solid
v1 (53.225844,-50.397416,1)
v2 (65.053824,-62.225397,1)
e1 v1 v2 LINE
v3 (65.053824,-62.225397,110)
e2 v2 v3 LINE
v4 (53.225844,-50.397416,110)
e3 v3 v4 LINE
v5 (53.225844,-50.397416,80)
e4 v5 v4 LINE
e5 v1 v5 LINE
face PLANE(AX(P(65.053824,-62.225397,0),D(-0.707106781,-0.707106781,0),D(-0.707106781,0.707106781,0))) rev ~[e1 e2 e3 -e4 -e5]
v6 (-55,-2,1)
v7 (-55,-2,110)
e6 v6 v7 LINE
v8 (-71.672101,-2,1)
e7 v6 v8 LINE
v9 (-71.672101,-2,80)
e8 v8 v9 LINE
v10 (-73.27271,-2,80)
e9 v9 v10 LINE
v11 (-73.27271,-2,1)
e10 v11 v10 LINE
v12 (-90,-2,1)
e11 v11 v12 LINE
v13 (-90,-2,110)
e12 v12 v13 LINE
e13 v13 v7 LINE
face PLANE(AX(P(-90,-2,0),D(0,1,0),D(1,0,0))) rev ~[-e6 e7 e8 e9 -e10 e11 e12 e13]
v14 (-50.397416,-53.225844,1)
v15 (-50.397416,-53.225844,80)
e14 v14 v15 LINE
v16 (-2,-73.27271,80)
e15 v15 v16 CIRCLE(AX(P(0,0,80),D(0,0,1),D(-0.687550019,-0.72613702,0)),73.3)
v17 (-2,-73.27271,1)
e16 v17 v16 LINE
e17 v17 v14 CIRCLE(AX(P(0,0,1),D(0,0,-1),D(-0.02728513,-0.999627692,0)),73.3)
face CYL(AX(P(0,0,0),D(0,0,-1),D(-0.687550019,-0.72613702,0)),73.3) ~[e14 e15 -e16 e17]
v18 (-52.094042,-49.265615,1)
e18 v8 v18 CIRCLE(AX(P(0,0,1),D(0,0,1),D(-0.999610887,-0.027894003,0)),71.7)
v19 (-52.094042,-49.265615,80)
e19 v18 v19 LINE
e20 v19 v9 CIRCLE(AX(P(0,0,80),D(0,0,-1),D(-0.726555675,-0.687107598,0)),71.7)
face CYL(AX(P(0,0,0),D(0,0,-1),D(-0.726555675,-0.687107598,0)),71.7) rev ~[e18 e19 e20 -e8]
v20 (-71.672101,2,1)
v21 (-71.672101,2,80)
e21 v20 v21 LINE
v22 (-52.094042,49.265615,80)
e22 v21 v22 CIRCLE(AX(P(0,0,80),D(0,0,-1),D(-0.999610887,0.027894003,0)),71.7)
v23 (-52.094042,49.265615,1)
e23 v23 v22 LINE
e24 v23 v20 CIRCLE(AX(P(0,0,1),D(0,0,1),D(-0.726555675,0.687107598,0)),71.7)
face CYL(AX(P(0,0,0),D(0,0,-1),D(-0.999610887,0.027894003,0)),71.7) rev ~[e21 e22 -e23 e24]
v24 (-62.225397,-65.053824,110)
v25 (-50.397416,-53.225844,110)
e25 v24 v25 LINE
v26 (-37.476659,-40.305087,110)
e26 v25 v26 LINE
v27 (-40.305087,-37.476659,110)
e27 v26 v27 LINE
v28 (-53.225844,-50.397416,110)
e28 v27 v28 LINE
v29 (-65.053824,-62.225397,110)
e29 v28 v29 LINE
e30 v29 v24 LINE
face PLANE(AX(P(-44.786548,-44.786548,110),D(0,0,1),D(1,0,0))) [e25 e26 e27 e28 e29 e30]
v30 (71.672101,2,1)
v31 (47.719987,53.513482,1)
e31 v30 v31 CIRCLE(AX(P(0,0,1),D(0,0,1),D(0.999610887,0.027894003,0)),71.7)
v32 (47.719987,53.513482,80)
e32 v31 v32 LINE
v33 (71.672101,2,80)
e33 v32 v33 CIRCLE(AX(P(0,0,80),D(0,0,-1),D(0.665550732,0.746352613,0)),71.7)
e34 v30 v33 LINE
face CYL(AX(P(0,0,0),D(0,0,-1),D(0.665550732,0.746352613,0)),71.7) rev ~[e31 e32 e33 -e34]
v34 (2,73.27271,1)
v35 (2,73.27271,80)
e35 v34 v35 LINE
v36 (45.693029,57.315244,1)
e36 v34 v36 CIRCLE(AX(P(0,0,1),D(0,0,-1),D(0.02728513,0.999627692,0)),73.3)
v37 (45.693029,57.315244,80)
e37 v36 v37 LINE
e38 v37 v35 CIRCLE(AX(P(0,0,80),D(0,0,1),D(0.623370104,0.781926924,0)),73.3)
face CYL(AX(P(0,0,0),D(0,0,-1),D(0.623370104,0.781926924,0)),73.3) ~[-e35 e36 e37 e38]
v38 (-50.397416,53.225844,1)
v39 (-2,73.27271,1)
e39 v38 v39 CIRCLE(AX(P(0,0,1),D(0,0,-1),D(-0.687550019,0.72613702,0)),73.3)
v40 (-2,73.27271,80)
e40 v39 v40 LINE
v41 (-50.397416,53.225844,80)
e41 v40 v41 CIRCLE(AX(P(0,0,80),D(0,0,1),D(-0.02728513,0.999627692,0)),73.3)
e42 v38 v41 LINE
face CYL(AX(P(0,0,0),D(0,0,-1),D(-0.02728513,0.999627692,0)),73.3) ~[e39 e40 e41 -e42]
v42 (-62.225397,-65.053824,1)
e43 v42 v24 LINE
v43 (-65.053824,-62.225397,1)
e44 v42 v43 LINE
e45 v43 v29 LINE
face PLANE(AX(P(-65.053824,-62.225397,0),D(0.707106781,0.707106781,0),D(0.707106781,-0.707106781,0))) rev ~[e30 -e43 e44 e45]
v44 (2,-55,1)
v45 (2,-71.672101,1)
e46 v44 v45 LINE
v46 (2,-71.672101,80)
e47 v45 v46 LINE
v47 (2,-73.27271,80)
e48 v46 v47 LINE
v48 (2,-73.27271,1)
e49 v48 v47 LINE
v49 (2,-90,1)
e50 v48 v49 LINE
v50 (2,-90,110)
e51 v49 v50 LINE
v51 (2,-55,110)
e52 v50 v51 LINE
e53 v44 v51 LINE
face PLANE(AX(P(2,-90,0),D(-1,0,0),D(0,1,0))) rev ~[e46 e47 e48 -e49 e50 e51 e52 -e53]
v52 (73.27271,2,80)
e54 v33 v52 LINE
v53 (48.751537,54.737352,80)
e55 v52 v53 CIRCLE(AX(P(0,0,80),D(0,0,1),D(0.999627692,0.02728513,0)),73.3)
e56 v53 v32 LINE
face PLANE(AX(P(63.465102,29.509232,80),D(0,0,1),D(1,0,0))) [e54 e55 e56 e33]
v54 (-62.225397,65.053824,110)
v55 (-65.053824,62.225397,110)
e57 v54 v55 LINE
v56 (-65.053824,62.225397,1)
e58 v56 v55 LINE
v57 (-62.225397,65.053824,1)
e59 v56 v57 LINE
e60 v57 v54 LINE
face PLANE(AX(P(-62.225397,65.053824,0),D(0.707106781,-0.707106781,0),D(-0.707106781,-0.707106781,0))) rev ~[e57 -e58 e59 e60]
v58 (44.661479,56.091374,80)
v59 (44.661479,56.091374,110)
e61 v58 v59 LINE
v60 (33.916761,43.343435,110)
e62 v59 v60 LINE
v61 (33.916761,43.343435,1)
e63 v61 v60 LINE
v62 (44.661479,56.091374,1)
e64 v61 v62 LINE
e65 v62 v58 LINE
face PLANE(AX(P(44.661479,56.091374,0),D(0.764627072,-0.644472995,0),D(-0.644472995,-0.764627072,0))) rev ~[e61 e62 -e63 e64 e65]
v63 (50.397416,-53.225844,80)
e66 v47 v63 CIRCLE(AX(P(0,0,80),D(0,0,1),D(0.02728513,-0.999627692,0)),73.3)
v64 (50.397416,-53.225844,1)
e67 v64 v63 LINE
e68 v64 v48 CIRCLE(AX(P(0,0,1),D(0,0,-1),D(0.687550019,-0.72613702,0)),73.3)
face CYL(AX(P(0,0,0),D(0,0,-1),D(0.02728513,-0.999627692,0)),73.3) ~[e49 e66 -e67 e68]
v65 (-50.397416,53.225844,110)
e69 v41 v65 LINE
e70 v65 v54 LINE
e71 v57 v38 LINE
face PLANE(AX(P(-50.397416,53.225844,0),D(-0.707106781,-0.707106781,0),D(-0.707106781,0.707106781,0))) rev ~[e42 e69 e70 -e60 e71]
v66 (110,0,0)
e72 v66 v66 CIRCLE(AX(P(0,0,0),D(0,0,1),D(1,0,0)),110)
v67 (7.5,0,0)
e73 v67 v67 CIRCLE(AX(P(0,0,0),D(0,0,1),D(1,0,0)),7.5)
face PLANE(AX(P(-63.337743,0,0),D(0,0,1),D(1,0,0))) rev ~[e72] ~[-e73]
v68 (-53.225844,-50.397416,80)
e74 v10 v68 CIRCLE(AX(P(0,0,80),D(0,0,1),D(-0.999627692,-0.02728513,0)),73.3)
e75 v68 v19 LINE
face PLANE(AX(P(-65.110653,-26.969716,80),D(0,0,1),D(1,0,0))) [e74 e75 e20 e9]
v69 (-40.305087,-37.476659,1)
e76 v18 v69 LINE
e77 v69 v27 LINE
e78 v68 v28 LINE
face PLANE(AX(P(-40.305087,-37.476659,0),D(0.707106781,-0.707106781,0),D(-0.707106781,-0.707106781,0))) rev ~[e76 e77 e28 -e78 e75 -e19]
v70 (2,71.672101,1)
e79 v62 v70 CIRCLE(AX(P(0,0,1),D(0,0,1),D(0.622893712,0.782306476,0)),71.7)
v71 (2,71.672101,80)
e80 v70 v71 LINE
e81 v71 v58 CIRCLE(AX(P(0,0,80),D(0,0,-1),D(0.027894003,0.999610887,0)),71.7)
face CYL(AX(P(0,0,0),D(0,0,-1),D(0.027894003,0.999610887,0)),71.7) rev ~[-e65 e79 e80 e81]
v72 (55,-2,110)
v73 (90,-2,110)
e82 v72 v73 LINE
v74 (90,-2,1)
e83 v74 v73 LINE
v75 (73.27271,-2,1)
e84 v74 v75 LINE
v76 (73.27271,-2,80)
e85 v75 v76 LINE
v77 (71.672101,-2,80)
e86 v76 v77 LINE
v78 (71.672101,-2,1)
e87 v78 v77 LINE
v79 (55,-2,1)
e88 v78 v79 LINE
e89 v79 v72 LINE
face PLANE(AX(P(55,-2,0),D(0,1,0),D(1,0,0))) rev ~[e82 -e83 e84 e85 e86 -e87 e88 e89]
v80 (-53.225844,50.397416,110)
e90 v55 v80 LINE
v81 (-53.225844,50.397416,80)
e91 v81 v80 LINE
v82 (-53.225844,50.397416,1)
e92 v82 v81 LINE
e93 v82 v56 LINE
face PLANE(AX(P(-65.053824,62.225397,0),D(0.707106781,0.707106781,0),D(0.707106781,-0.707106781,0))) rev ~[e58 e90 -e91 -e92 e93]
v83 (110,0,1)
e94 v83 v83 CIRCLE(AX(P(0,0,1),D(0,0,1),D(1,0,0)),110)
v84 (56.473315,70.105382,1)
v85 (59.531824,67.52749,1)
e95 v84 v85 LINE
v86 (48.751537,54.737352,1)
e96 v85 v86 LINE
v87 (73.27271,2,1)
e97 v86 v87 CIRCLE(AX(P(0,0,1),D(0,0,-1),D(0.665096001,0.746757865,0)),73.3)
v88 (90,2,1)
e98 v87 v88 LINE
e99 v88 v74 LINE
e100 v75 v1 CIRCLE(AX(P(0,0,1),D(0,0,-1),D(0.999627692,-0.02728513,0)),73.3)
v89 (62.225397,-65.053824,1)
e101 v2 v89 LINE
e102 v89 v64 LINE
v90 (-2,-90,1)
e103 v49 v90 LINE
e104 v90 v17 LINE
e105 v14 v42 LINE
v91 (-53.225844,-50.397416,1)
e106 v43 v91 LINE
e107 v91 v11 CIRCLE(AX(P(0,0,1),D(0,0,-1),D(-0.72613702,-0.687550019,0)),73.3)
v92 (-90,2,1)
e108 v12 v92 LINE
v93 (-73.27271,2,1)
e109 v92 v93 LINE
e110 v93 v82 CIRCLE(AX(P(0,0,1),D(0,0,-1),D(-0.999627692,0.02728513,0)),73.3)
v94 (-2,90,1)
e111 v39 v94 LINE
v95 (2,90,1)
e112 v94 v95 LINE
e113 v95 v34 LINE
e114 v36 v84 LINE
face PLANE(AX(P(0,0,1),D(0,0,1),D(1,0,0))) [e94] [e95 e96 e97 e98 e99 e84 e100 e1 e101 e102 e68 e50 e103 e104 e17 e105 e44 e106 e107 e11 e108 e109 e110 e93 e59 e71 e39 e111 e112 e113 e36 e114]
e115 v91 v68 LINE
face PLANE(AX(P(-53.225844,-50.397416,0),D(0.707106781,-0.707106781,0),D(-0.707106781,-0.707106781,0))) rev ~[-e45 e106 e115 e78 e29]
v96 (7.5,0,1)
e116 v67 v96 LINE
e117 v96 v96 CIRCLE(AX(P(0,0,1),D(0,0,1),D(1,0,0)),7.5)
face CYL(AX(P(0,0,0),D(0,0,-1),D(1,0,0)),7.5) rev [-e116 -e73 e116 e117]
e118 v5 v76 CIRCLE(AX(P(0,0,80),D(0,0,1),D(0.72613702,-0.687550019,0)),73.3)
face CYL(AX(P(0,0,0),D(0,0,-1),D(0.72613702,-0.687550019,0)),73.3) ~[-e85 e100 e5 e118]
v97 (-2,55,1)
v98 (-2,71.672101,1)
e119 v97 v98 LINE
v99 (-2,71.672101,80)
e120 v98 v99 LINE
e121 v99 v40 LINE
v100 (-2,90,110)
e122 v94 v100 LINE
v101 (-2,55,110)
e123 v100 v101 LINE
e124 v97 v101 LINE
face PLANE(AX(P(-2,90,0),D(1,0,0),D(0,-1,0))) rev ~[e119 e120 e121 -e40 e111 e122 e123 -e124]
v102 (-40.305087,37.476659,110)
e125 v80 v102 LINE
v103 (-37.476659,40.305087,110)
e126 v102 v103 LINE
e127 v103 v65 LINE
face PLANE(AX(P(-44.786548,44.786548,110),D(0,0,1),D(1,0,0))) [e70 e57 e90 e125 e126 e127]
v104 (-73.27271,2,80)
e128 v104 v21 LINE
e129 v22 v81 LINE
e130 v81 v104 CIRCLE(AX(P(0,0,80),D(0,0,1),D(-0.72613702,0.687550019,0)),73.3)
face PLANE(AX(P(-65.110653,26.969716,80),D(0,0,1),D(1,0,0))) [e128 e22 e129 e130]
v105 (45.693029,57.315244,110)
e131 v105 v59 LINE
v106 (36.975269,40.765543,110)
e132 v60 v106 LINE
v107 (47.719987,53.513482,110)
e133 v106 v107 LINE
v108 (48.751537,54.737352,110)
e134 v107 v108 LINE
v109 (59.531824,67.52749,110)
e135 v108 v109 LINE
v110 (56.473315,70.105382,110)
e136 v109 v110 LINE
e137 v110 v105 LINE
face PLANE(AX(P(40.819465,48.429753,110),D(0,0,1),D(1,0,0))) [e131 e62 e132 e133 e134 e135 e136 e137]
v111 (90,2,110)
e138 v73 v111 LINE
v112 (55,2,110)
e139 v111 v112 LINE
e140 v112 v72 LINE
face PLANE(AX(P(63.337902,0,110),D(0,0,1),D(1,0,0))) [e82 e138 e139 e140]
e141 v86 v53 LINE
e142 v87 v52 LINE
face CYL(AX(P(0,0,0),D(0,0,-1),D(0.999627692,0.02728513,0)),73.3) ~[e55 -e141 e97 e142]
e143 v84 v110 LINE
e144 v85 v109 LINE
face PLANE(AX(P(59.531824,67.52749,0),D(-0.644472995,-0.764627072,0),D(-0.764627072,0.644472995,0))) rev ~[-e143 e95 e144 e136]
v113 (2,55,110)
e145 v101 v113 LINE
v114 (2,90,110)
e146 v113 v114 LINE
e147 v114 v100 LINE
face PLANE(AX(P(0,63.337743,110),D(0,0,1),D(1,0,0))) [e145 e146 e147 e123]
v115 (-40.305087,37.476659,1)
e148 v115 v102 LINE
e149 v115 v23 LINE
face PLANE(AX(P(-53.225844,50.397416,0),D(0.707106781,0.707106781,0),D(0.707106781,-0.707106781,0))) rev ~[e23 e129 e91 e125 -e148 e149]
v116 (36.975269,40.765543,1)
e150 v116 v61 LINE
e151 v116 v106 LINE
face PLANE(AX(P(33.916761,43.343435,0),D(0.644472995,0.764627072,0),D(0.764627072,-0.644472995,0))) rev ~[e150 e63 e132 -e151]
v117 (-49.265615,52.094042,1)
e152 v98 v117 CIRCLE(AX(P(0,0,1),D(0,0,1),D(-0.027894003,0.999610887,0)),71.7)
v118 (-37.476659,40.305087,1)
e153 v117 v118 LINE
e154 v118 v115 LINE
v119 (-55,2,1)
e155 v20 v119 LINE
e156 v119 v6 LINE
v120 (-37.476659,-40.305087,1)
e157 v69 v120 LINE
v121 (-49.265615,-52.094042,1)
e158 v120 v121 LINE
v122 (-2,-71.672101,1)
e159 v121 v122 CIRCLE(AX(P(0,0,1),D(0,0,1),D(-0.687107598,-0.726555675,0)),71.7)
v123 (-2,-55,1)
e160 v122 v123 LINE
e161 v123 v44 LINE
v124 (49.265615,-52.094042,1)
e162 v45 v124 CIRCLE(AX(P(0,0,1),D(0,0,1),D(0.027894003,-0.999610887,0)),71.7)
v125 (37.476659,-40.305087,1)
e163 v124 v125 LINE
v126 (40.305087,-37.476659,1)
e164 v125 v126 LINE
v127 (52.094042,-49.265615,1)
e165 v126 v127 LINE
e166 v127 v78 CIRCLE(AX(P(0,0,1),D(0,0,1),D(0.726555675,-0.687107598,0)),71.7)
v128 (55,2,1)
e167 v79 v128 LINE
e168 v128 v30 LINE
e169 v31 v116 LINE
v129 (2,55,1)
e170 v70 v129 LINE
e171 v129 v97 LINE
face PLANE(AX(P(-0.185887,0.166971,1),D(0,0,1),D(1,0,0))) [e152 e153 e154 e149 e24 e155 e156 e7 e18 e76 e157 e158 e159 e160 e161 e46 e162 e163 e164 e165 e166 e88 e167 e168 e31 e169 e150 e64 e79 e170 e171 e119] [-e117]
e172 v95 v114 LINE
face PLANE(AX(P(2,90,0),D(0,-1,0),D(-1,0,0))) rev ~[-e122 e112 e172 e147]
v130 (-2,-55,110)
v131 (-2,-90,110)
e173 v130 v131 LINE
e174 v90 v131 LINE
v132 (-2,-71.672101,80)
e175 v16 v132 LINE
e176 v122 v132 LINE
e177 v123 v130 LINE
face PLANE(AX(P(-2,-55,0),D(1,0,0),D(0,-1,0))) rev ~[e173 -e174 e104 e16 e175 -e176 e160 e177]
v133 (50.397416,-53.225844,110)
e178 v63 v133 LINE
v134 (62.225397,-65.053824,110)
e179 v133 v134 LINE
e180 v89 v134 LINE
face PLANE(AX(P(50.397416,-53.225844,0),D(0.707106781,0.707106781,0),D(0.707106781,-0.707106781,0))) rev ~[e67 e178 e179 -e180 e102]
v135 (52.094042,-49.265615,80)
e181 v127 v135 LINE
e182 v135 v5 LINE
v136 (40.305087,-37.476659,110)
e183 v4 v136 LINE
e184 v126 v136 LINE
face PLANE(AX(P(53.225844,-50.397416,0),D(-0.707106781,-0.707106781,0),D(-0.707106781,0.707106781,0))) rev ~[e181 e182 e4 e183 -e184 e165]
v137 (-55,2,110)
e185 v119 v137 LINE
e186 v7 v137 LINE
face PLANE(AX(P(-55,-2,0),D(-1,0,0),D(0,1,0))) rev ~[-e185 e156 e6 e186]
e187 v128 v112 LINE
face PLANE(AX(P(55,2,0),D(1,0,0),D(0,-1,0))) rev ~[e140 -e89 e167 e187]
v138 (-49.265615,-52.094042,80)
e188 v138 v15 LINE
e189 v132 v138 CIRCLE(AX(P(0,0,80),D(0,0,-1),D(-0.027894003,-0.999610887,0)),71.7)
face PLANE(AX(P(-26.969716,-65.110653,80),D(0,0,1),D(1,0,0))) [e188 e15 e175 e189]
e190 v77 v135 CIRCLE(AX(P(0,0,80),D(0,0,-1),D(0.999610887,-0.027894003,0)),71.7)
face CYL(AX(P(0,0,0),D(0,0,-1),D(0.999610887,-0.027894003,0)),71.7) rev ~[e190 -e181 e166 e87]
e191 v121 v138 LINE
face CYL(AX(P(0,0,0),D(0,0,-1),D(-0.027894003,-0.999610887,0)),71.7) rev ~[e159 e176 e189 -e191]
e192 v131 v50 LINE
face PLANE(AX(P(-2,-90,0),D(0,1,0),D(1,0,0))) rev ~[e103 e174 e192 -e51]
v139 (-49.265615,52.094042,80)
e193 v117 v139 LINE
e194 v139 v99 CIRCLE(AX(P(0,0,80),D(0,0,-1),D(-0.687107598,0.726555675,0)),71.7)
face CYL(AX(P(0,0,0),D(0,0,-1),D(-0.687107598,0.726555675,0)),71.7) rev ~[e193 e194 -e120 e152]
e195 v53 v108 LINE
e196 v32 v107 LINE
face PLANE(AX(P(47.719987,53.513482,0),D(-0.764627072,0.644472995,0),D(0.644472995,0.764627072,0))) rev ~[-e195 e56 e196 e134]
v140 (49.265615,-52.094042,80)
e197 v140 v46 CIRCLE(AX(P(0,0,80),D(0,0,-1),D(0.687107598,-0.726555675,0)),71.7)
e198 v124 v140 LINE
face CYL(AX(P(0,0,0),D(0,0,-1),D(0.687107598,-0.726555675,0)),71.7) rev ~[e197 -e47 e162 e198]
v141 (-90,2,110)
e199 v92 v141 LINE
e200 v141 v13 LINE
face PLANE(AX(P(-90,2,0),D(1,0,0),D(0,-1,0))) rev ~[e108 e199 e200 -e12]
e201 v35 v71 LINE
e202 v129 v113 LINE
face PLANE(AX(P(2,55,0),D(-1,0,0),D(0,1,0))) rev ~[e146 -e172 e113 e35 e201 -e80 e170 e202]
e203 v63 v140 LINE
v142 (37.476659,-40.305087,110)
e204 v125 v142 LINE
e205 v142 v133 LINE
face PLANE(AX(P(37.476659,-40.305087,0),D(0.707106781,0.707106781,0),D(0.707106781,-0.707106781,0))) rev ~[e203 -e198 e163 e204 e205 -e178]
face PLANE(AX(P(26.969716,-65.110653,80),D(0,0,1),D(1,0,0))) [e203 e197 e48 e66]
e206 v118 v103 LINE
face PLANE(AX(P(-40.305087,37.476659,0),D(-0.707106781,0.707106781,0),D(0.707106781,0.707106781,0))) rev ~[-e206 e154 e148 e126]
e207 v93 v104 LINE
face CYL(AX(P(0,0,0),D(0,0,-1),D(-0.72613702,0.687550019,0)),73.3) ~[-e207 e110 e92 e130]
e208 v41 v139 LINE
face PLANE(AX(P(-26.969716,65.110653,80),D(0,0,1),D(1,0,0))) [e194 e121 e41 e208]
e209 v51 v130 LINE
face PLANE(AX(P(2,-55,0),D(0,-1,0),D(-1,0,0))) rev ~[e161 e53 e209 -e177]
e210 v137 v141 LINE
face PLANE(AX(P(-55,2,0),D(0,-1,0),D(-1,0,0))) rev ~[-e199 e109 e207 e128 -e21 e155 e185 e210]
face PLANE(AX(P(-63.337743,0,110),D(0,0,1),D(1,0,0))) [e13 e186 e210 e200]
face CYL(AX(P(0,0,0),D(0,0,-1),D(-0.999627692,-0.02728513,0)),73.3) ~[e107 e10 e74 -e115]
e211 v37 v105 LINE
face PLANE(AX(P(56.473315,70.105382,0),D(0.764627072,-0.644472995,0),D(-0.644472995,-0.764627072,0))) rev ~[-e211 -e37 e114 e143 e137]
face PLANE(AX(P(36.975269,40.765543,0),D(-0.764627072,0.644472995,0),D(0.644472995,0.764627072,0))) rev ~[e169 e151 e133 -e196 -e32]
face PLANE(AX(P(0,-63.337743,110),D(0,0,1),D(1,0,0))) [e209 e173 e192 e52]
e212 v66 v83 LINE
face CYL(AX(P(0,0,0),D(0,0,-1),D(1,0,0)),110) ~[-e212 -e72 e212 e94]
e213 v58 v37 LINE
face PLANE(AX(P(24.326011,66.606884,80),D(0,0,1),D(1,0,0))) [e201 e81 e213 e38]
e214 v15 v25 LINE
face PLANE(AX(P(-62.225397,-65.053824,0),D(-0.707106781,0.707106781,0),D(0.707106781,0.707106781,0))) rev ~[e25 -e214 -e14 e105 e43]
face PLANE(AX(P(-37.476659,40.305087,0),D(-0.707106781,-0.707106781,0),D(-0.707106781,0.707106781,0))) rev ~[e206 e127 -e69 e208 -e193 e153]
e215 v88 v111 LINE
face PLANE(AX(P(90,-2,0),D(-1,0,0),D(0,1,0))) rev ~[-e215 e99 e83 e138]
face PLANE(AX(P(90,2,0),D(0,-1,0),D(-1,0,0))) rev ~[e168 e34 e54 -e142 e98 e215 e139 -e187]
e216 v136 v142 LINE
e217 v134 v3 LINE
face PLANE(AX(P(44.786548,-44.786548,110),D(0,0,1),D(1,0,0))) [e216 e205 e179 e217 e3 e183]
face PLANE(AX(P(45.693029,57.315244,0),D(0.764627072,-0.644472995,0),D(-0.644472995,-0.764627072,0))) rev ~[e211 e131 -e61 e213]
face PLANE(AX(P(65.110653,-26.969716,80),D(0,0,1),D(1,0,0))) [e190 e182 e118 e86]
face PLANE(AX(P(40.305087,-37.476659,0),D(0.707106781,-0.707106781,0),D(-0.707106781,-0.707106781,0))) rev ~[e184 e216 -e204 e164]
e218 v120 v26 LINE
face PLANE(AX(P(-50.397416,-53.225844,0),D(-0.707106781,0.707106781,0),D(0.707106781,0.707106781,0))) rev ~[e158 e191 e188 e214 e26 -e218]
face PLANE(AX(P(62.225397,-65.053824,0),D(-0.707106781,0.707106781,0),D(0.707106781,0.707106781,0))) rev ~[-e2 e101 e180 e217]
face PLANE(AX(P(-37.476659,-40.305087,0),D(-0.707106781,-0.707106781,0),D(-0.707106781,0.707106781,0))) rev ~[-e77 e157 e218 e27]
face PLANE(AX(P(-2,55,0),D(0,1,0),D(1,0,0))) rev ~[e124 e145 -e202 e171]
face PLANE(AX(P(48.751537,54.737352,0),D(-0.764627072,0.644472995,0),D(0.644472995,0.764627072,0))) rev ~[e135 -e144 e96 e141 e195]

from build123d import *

# Parameters (mm, degrees)
F0_R     = 110
F1_DEPTH = 1
F0_R_2   = 7.5
F2_DEPTH = 110
F3_DEPTH = 80


with BuildPart() as f1:
    # F0 (on Top) → F1 (new body)
    with BuildSketch(Plane.XY):
        Circle(F0_R)
        with BuildLine():
            Line((-90, 2), (-73.2727097902, 2))
            ThreePointArc((-73.2727097902, 2), (-67.7203697331, 28.0506955924), (-53.2258435309, 50.3974164062))
            Line((-53.2258435309, 50.3974164062), (-65.0538238692, 62.2253967444))
            Line((-65.0538238692, 62.2253967444), (-62.2253967444, 65.0538238692))
            Line((-62.2253967444, 65.0538238692), (-50.3974164062, 53.2258435309))
            ThreePointArc((-50.3974164062, 53.2258435309), (-28.0506955924, 67.7203697331), (-2, 73.2727097902))
            Line((-2, 73.2727097902), (-2, 90))
            Line((-2, 90), (2, 90))
            Line((2, 90), (2, 73.2727097902))
            ThreePointArc((2, 73.2727097902), (25.1459027822, 68.8518233111), (45.6930285955, 57.3152435027))
            Line((45.6930285955, 57.3152435027), (56.4733154171, 70.105382431))
            Line((56.4733154171, 70.105382431), (59.5318237034, 67.5274904506))
            Line((59.5318237034, 67.5274904506), (48.7515368817, 54.7373515223))
            ThreePointArc((48.7515368817, 54.7373515223), (66.4664295367, 30.904752784), (73.2727097902, 2))
            Line((73.2727097902, 2), (90, 2))
            Line((90, 2), (90, -2))
            Line((90, -2), (73.2727097902, -2))
            ThreePointArc((73.2727097902, -2), (67.7203697331, -28.0506955924), (53.2258435309, -50.3974164062))
            Line((53.2258435309, -50.3974164062), (65.0538238692, -62.2253967444))
            Line((65.0538238692, -62.2253967444), (62.2253967444, -65.0538238692))
            Line((62.2253967444, -65.0538238692), (50.3974164062, -53.2258435309))
            ThreePointArc((50.3974164062, -53.2258435309), (28.0506955924, -67.7203697331), (2, -73.2727097902))
            Line((2, -73.2727097902), (2, -90))
            Line((2, -90), (-2, -90))
            Line((-2, -90), (-2, -73.2727097902))
            ThreePointArc((-2, -73.2727097902), (-28.0506955924, -67.7203697331), (-50.3974164062, -53.2258435309))
            Line((-50.3974164062, -53.2258435309), (-62.2253967444, -65.0538238692))
            Line((-62.2253967444, -65.0538238692), (-65.0538238692, -62.2253967444))
            Line((-65.0538238692, -62.2253967444), (-53.2258435309, -50.3974164062))
            ThreePointArc((-53.2258435309, -50.3974164062), (-67.7203697331, -28.0506955924), (-73.2727097902, -2))
            Line((-73.2727097902, -2), (-90, -2))
            Line((-90, -2), (-90, 2))
        make_face(mode=Mode.SUBTRACT)
    extrude(amount=F1_DEPTH)



with BuildPart() as f1b:
    # F0 (on Top) → F1, piece 2 (new body)
    with BuildSketch(Plane.XY):
        with BuildLine():
            Line((-71.6721005692, 2), (-55, 2))
            Line((-55, 2), (-55, -2))
            Line((-55, -2), (-71.6721005692, -2))
            ThreePointArc((-71.6721005692, -2), (-66.2421624811, -27.4384021006), (-52.0940418967, -49.265614772))
            Line((-52.0940418967, -49.265614772), (-40.3050865276, -37.4766594029))
            Line((-40.3050865276, -37.4766594029), (-37.4766594029, -40.3050865276))
            Line((-37.4766594029, -40.3050865276), (-49.265614772, -52.0940418967))
            ThreePointArc((-49.265614772, -52.0940418967), (-27.4384021006, -66.2421624811), (-2, -71.6721005692))
            Line((-2, -71.6721005692), (-2, -55))
            Line((-2, -55), (2, -55))
            Line((2, -55), (2, -71.6721005692))
            ThreePointArc((2, -71.6721005692), (27.4384021006, -66.2421624811), (49.265614772, -52.0940418967))
            Line((49.265614772, -52.0940418967), (37.4766594029, -40.3050865276))
            Line((37.4766594029, -40.3050865276), (40.3050865276, -37.4766594029))
            Line((40.3050865276, -37.4766594029), (52.0940418967, -49.265614772))
            ThreePointArc((52.0940418967, -49.265614772), (66.2421624811, -27.4384021006), (71.6721005692, -2))
            Line((71.6721005692, -2), (55, -2))
            Line((55, -2), (55, 2))
            Line((55, 2), (71.6721005692, 2))
            ThreePointArc((71.6721005692, 2), (65.0155934213, 30.2301606359), (47.719987463, 53.5134823809))
            Line((47.719987463, 53.5134823809), (36.9752688744, 40.7655429458))
            Line((36.9752688744, 40.7655429458), (33.9167605881, 43.3434349263))
            Line((33.9167605881, 43.3434349263), (44.6614791768, 56.0913743613))
            ThreePointArc((44.6614791768, 56.0913743613), (24.597015409, 67.3489185731), (2, 71.6721005692))
            Line((2, 71.6721005692), (2, 55))
            Line((2, 55), (-2, 55))
            Line((-2, 55), (-2, 71.6721005692))
            ThreePointArc((-2, 71.6721005692), (-27.4384021006, 66.2421624811), (-49.265614772, 52.0940418967))
            Line((-49.265614772, 52.0940418967), (-37.4766594029, 40.3050865276))
            Line((-37.4766594029, 40.3050865276), (-40.3050865276, 37.4766594029))
            Line((-40.3050865276, 37.4766594029), (-52.0940418967, 49.265614772))
            ThreePointArc((-52.0940418967, 49.265614772), (-66.2421624811, 27.4384021006), (-71.6721005692, 2))
        make_face()
        Circle(F0_R_2, mode=Mode.SUBTRACT)
    extrude(amount=F1_DEPTH)


with BuildPart() as f1_1:
    add(f1.part)

    add(f1b.part)  # F2 merges F1b
    # F0 (on Top) → F2 (join)
    with BuildSketch(Plane.XY):
        with BuildLine():
            Line((-55, -2), (-55, 2))
            Line((-55, 2), (-71.6721005692, 2))
            ThreePointArc((-71.6721005692, 2), (-71.7, 0), (-71.6721005692, -2))
            Line((-71.6721005692, -2), (-55, -2))
        make_face()
        with BuildLine():
            ThreePointArc((-71.6721005692, -2), (-71.7, 0), (-71.6721005692, 2))
            Line((-71.6721005692, 2), (-73.2727097902, 2))
            ThreePointArc((-73.2727097902, 2), (-73.3, 0), (-73.2727097902, -2))
            Line((-73.2727097902, -2), (-71.6721005692, -2))
        make_face()
        with BuildLine():
            ThreePointArc((-73.2727097902, -2), (-73.3, 0), (-73.2727097902, 2))
            Line((-73.2727097902, 2), (-90, 2))
            Line((-90, 2), (-90, -2))
            Line((-90, -2), (-73.2727097902, -2))
        make_face()
        with BuildLine():
            ThreePointArc((-49.265614772, 52.0940418967), (-50.6995562111, 50.6995562111), (-52.0940418967, 49.265614772))
            Line((-52.0940418967, 49.265614772), (-40.3050865276, 37.4766594029))
            Line((-40.3050865276, 37.4766594029), (-37.4766594029, 40.3050865276))
            Line((-37.4766594029, 40.3050865276), (-49.265614772, 52.0940418967))
        make_face()
        with BuildLine():
            Line((-53.2258435309, 50.3974164062), (-52.0940418967, 49.265614772))
            ThreePointArc((-52.0940418967, 49.265614772), (-50.6995562111, 50.6995562111), (-49.265614772, 52.0940418967))
            Line((-49.265614772, 52.0940418967), (-50.3974164062, 53.2258435309))
            ThreePointArc((-50.3974164062, 53.2258435309), (-51.830927061, 51.830927061), (-53.2258435309, 50.3974164062))
        make_face()
        with BuildLine():
            Line((-65.0538238692, 62.2253967444), (-53.2258435309, 50.3974164062))
            ThreePointArc((-53.2258435309, 50.3974164062), (-51.830927061, 51.830927061), (-50.3974164062, 53.2258435309))
            Line((-50.3974164062, 53.2258435309), (-62.2253967444, 65.0538238692))
            Line((-62.2253967444, 65.0538238692), (-65.0538238692, 62.2253967444))
        make_face()
        with BuildLine():
            ThreePointArc((2, 71.6721005692), (0, 71.7), (-2, 71.6721005692))
            Line((-2, 71.6721005692), (-2, 55))
            Line((-2, 55), (2, 55))
            Line((2, 55), (2, 71.6721005692))
        make_face()
        with BuildLine():
            Line((-2, 73.2727097902), (-2, 71.6721005692))
            ThreePointArc((-2, 71.6721005692), (0, 71.7), (2, 71.6721005692))
            Line((2, 71.6721005692), (2, 73.2727097902))
            ThreePointArc((2, 73.2727097902), (0, 73.3), (-2, 73.2727097902))
        make_face()
        with BuildLine():
            Line((-2, 90), (-2, 73.2727097902))
            ThreePointArc((-2, 73.2727097902), (0, 73.3), (2, 73.2727097902))
            Line((2, 73.2727097902), (2, 90))
            Line((2, 90), (-2, 90))
        make_face()
        with BuildLine():
            ThreePointArc((47.719987463, 53.5134823809), (46.2087137496, 54.8237610312), (44.6614791768, 56.0913743613))
            Line((44.6614791768, 56.0913743613), (33.9167605881, 43.3434349263))
            Line((33.9167605881, 43.3434349263), (36.9752688744, 40.7655429458))
            Line((36.9752688744, 40.7655429458), (47.719987463, 53.5134823809))
        make_face()
        with BuildLine():
            Line((45.6930285955, 57.3152435027), (44.6614791768, 56.0913743613))
            ThreePointArc((44.6614791768, 56.0913743613), (46.2087137496, 54.8237610312), (47.719987463, 53.5134823809))
            Line((47.719987463, 53.5134823809), (48.7515368817, 54.7373515223))
            ThreePointArc((48.7515368817, 54.7373515223), (47.2398705418, 56.0471643457), (45.6930285955, 57.3152435027))
        make_face()
        with BuildLine():
            Line((56.4733154171, 70.105382431), (45.6930285955, 57.3152435027))
            ThreePointArc((45.6930285955, 57.3152435027), (47.2398705418, 56.0471643457), (48.7515368817, 54.7373515223))
            Line((48.7515368817, 54.7373515223), (59.5318237034, 67.5274904506))
            Line((59.5318237034, 67.5274904506), (56.4733154171, 70.105382431))
        make_face()
        with BuildLine():
            ThreePointArc((71.7, 0), (71.693024803, 1.0000972925), (71.6721005692, 2))
            Line((71.6721005692, 2), (55, 2))
            Line((55, 2), (55, -2))
            Line((55, -2), (71.6721005692, -2))
            ThreePointArc((71.6721005692, -2), (71.693024803, -1.0000972925), (71.7, 0))
        make_face()
        with BuildLine():
            Line((73.2727097902, 2), (71.6721005692, 2))
            ThreePointArc((71.6721005692, 2), (71.693024803, 1.0000972925), (71.7, 0))
            ThreePointArc((71.7, 0), (71.693024803, -1.0000972925), (71.6721005692, -2))
            Line((71.6721005692, -2), (73.2727097902, -2))
            ThreePointArc((73.2727097902, -2), (73.29317713, -1.0000930901), (73.3, 0))
            ThreePointArc((73.3, 0), (73.29317713, 1.0000930901), (73.2727097902, 2))
        make_face()
        with BuildLine():
            Line((90, 2), (73.2727097902, 2))
            ThreePointArc((73.2727097902, 2), (73.29317713, 1.0000930901), (73.3, 0))
            ThreePointArc((73.3, 0), (73.29317713, -1.0000930901), (73.2727097902, -2))
            Line((73.2727097902, -2), (90, -2))
            Line((90, -2), (90, 2))
        make_face()
        with BuildLine():
            Line((37.4766594029, -40.3050865276), (49.265614772, -52.0940418967))
            ThreePointArc((49.265614772, -52.0940418967), (50.6995562111, -50.6995562111), (52.0940418967, -49.265614772))
            Line((52.0940418967, -49.265614772), (40.3050865276, -37.4766594029))
            Line((40.3050865276, -37.4766594029), (37.4766594029, -40.3050865276))
        make_face()
        with BuildLine():
            ThreePointArc((52.0940418967, -49.265614772), (50.6995562111, -50.6995562111), (49.265614772, -52.0940418967))
            Line((49.265614772, -52.0940418967), (50.3974164062, -53.2258435309))
            ThreePointArc((50.3974164062, -53.2258435309), (51.830927061, -51.830927061), (53.2258435309, -50.3974164062))
            Line((53.2258435309, -50.3974164062), (52.0940418967, -49.265614772))
        make_face()
        with BuildLine():
            ThreePointArc((53.2258435309, -50.3974164062), (51.830927061, -51.830927061), (50.3974164062, -53.2258435309))
            Line((50.3974164062, -53.2258435309), (62.2253967444, -65.0538238692))
            Line((62.2253967444, -65.0538238692), (65.0538238692, -62.2253967444))
            Line((65.0538238692, -62.2253967444), (53.2258435309, -50.3974164062))
        make_face()
        with BuildLine():
            Line((-2, -55), (-2, -71.6721005692))
            ThreePointArc((-2, -71.6721005692), (0, -71.7), (2, -71.6721005692))
            Line((2, -71.6721005692), (2, -55))
            Line((2, -55), (-2, -55))
        make_face()
        with BuildLine():
            ThreePointArc((2, -71.6721005692), (0, -71.7), (-2, -71.6721005692))
            Line((-2, -71.6721005692), (-2, -73.2727097902))
            ThreePointArc((-2, -73.2727097902), (0, -73.3), (2, -73.2727097902))
            Line((2, -73.2727097902), (2, -71.6721005692))
        make_face()
        with BuildLine():
            ThreePointArc((2, -73.2727097902), (0, -73.3), (-2, -73.2727097902))
            Line((-2, -73.2727097902), (-2, -90))
            Line((-2, -90), (2, -90))
            Line((2, -90), (2, -73.2727097902))
        make_face()
        with BuildLine():
            Line((-40.3050865276, -37.4766594029), (-52.0940418967, -49.265614772))
            ThreePointArc((-52.0940418967, -49.265614772), (-50.6995562111, -50.6995562111), (-49.265614772, -52.0940418967))
            Line((-49.265614772, -52.0940418967), (-37.4766594029, -40.3050865276))
            Line((-37.4766594029, -40.3050865276), (-40.3050865276, -37.4766594029))
        make_face()
        with BuildLine():
            ThreePointArc((-49.265614772, -52.0940418967), (-50.6995562111, -50.6995562111), (-52.0940418967, -49.265614772))
            Line((-52.0940418967, -49.265614772), (-53.2258435309, -50.3974164062))
            ThreePointArc((-53.2258435309, -50.3974164062), (-51.830927061, -51.830927061), (-50.3974164062, -53.2258435309))
            Line((-50.3974164062, -53.2258435309), (-49.265614772, -52.0940418967))
        make_face()
        with BuildLine():
            ThreePointArc((-50.3974164062, -53.2258435309), (-51.830927061, -51.830927061), (-53.2258435309, -50.3974164062))
            Line((-53.2258435309, -50.3974164062), (-65.0538238692, -62.2253967444))
            Line((-65.0538238692, -62.2253967444), (-62.2253967444, -65.0538238692))
            Line((-62.2253967444, -65.0538238692), (-50.3974164062, -53.2258435309))
        make_face()
    extrude(amount=F2_DEPTH)

    # F0 (on Top) → F3 (join)
    with BuildSketch(Plane.XY):
        with BuildLine():
            Line((-73.2727097902, 2), (-71.6721005692, 2))
            ThreePointArc((-71.6721005692, 2), (-66.2421624811, 27.4384021006), (-52.0940418967, 49.265614772))
            Line((-52.0940418967, 49.265614772), (-53.2258435309, 50.3974164062))
            ThreePointArc((-53.2258435309, 50.3974164062), (-67.7203697331, 28.0506955924), (-73.2727097902, 2))
        make_face()
        with BuildLine():
            Line((-50.3974164062, 53.2258435309), (-49.265614772, 52.0940418967))
            ThreePointArc((-49.265614772, 52.0940418967), (-27.4384021006, 66.2421624811), (-2, 71.6721005692))
            Line((-2, 71.6721005692), (-2, 73.2727097902))
            ThreePointArc((-2, 73.2727097902), (-28.0506955924, 67.7203697331), (-50.3974164062, 53.2258435309))
        make_face()
        with BuildLine():
            Line((2, 73.2727097902), (2, 71.6721005692))
            ThreePointArc((2, 71.6721005692), (24.597015409, 67.3489185731), (44.6614791768, 56.0913743613))
            Line((44.6614791768, 56.0913743613), (45.6930285955, 57.3152435027))
            ThreePointArc((45.6930285955, 57.3152435027), (25.1459027822, 68.8518233111), (2, 73.2727097902))
        make_face()
        with BuildLine():
            Line((48.7515368817, 54.7373515223), (47.719987463, 53.5134823809))
            ThreePointArc((47.719987463, 53.5134823809), (65.0155934213, 30.2301606359), (71.6721005692, 2))
            Line((71.6721005692, 2), (73.2727097902, 2))
            ThreePointArc((73.2727097902, 2), (66.4664295367, 30.904752784), (48.7515368817, 54.7373515223))
        make_face()
        with BuildLine():
            ThreePointArc((71.6721005692, -2), (66.2421624811, -27.4384021006), (52.0940418967, -49.265614772))
            Line((52.0940418967, -49.265614772), (53.2258435309, -50.3974164062))
            ThreePointArc((53.2258435309, -50.3974164062), (67.7203697331, -28.0506955924), (73.2727097902, -2))
            Line((73.2727097902, -2), (71.6721005692, -2))
        make_face()
        with BuildLine():
            ThreePointArc((49.265614772, -52.0940418967), (27.4384021006, -66.2421624811), (2, -71.6721005692))
            Line((2, -71.6721005692), (2, -73.2727097902))
            ThreePointArc((2, -73.2727097902), (28.0506955924, -67.7203697331), (50.3974164062, -53.2258435309))
            Line((50.3974164062, -53.2258435309), (49.265614772, -52.0940418967))
        make_face()
        with BuildLine():
            ThreePointArc((-2, -71.6721005692), (-27.4384021006, -66.2421624811), (-49.265614772, -52.0940418967))
            Line((-49.265614772, -52.0940418967), (-50.3974164062, -53.2258435309))
            ThreePointArc((-50.3974164062, -53.2258435309), (-28.0506955924, -67.7203697331), (-2, -73.2727097902))
            Line((-2, -73.2727097902), (-2, -71.6721005692))
        make_face()
        with BuildLine():
            ThreePointArc((-52.0940418967, -49.265614772), (-66.2421624811, -27.4384021006), (-71.6721005692, -2))
            Line((-71.6721005692, -2), (-73.2727097902, -2))
            ThreePointArc((-73.2727097902, -2), (-67.7203697331, -28.0506955924), (-53.2258435309, -50.3974164062))
            Line((-53.2258435309, -50.3974164062), (-52.0940418967, -49.265614772))
        make_face()
    extrude(amount=F3_DEPTH)


solid = f1_1.part
